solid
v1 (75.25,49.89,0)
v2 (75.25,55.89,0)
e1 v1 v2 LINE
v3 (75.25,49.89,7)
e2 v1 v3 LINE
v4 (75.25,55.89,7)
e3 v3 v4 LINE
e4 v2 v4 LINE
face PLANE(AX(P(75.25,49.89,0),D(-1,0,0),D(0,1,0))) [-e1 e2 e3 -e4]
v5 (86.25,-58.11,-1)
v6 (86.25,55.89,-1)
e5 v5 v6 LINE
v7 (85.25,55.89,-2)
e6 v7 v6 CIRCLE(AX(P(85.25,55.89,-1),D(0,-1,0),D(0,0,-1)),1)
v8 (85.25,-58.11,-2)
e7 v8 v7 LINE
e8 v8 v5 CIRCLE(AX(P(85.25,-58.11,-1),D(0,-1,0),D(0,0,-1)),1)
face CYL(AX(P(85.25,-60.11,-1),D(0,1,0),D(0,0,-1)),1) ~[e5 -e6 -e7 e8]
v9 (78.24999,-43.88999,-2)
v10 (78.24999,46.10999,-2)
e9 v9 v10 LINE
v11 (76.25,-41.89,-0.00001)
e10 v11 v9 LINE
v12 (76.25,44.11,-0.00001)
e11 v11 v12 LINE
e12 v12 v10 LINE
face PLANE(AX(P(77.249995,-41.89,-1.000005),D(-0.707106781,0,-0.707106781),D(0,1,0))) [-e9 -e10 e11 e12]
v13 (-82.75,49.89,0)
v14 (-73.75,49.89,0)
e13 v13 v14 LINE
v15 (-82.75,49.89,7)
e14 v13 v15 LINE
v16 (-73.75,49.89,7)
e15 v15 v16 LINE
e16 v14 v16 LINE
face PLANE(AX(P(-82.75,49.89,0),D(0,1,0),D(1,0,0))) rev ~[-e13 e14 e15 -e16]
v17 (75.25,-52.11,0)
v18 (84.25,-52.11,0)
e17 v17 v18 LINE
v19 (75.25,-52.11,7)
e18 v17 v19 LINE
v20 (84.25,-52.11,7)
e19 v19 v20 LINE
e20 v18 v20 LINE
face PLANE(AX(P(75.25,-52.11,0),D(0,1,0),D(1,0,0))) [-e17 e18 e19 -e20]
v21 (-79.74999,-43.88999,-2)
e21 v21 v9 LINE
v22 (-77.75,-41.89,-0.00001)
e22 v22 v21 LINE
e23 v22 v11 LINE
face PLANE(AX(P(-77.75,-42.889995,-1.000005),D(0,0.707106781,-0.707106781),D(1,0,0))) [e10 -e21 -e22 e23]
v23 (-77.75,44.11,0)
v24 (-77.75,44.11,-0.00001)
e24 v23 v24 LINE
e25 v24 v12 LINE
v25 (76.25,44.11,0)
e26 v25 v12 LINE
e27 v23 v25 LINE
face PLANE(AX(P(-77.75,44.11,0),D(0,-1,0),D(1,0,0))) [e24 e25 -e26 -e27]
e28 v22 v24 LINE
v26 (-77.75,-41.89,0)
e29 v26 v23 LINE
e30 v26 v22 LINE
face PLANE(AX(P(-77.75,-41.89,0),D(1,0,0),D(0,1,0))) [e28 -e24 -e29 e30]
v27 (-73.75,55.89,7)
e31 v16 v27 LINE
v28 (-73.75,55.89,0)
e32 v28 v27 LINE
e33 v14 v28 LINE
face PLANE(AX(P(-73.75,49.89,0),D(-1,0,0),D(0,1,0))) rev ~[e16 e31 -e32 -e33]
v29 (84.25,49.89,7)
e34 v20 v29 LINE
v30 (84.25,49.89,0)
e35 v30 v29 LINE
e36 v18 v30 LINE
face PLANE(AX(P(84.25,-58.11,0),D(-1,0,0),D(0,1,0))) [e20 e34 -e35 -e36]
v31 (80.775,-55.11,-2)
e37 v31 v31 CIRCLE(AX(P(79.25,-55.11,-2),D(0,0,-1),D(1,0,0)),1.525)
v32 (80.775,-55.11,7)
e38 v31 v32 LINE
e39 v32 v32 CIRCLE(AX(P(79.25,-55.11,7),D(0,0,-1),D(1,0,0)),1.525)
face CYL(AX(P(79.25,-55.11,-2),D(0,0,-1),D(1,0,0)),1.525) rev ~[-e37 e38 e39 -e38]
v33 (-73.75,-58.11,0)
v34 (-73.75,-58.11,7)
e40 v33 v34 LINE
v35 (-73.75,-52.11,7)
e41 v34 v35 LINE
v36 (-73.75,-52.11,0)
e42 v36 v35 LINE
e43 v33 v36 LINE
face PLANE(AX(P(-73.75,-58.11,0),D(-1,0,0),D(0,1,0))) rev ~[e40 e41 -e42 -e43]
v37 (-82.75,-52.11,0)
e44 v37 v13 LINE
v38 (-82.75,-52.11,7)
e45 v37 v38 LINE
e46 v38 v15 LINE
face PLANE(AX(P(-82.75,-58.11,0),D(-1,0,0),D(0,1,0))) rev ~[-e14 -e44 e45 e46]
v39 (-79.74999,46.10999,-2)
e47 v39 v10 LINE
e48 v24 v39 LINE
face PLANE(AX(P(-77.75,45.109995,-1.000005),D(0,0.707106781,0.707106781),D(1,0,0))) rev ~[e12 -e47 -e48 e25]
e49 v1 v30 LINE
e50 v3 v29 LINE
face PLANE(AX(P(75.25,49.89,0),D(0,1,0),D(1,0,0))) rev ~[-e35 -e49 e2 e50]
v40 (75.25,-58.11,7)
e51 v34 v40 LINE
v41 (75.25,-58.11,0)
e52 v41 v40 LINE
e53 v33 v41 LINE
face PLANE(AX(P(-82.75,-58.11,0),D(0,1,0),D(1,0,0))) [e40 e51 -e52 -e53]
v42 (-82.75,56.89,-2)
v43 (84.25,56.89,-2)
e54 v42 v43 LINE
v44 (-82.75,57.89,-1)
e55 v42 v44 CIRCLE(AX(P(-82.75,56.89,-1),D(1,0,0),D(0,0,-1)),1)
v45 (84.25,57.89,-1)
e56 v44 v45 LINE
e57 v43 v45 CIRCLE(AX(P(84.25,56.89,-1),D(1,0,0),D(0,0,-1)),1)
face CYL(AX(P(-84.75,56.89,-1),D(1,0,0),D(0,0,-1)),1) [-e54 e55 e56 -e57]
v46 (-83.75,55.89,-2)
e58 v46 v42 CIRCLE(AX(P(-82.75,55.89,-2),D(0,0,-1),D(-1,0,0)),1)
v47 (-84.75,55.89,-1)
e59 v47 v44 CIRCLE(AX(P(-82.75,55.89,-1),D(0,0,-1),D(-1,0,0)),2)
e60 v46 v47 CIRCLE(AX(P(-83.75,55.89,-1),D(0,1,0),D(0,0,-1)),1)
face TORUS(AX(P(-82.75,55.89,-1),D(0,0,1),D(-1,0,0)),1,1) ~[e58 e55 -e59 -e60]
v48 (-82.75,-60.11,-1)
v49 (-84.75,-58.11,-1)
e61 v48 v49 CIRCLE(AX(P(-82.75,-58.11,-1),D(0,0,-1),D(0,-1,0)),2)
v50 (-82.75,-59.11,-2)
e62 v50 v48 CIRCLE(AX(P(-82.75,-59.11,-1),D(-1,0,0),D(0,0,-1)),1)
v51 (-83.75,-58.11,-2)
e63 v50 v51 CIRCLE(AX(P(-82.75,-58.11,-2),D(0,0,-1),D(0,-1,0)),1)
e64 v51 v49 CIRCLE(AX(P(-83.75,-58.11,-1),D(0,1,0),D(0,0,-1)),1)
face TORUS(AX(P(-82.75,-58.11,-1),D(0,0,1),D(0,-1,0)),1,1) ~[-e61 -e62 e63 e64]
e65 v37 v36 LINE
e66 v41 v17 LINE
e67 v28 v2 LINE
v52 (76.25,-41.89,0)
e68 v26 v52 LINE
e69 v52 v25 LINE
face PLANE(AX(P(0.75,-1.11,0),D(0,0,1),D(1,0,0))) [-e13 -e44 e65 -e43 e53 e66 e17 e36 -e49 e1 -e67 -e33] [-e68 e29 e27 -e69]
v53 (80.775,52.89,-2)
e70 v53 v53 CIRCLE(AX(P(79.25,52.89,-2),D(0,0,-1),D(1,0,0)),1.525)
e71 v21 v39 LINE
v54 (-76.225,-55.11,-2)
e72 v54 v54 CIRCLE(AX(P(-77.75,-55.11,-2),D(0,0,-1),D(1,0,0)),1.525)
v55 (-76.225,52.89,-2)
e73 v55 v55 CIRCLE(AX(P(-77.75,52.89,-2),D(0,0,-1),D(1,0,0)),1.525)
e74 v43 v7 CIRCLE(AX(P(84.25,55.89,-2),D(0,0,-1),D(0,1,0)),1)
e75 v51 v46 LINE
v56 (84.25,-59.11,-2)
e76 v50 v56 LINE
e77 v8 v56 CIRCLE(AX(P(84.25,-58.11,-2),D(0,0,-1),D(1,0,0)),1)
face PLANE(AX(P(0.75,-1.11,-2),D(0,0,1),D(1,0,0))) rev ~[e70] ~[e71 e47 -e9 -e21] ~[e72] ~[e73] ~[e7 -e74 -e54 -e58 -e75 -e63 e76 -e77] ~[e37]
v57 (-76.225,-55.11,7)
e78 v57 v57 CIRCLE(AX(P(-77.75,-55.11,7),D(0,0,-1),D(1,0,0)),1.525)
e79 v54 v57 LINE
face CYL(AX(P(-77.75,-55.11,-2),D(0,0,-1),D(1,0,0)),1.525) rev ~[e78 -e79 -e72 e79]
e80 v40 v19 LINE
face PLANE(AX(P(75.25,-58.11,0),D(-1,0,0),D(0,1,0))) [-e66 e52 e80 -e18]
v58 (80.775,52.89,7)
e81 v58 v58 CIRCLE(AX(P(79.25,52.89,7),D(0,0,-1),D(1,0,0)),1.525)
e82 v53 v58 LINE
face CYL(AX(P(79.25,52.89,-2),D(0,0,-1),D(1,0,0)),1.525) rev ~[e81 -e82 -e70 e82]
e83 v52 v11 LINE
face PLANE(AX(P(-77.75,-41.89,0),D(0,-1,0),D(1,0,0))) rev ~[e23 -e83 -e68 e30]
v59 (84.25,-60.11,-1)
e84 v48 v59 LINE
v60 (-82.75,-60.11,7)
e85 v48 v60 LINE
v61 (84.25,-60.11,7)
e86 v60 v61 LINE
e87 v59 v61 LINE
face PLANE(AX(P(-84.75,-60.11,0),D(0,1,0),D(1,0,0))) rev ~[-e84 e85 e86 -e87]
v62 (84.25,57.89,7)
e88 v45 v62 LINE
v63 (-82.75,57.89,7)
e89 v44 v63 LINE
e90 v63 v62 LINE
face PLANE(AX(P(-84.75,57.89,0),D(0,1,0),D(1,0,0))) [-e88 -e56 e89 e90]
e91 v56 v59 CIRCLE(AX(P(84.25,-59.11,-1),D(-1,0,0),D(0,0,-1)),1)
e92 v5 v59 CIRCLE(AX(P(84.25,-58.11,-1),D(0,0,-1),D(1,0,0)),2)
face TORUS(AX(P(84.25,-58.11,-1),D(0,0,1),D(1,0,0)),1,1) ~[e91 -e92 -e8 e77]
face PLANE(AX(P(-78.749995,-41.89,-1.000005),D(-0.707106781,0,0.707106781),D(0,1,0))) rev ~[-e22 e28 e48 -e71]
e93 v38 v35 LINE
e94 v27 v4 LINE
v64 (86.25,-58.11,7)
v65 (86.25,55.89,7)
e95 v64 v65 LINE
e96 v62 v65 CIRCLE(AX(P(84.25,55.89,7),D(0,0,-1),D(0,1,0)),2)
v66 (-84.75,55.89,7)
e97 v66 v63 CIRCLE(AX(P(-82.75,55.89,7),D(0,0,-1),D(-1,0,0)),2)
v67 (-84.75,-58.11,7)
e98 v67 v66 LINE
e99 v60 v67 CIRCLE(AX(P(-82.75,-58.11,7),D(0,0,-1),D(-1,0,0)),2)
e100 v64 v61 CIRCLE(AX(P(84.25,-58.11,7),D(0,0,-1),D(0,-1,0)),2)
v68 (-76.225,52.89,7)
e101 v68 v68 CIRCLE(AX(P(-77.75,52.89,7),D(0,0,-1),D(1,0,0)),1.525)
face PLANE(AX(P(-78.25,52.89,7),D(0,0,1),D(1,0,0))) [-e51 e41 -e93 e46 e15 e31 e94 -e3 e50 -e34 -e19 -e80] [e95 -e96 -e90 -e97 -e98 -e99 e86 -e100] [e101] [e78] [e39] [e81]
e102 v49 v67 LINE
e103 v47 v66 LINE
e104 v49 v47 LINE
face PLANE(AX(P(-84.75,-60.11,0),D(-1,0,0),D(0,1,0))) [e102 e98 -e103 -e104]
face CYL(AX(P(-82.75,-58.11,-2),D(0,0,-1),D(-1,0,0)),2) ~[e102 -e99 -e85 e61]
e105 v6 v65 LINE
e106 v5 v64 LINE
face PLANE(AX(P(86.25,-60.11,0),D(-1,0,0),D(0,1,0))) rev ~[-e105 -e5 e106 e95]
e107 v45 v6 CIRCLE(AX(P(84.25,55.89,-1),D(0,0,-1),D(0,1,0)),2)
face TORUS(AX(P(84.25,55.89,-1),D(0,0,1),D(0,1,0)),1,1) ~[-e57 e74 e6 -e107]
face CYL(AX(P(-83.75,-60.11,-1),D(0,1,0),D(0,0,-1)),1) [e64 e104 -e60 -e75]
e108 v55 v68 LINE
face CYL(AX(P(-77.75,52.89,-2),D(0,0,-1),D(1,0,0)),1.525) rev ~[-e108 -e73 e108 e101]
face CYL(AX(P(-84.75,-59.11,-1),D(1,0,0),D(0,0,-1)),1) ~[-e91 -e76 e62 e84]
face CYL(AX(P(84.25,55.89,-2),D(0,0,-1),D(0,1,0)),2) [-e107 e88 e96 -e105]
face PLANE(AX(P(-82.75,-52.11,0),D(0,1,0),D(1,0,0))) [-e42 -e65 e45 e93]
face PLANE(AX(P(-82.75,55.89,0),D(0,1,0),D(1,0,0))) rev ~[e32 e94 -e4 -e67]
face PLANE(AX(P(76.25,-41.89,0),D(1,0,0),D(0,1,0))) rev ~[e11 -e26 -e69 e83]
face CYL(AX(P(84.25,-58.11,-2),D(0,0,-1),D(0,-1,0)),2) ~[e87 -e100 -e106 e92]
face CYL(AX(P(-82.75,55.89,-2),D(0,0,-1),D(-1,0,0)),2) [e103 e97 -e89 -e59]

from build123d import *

# Parameters (mm, degrees)
F0_W          = 171
F0_H          = 118
F0_W_2        = 154
F0_H_2        = 86
F1_DEPTH      = 2
F2_SIZE       = 1.99999
F3_R          = 1
F4_W          = 171
F4_H          = 118
F4_W_2        = 167
F4_H_2        = 114
F5_DEPTH      = 7
F6_W          = 9
F6_H          = 6
F7_DEPTH      = 7
F8_R          = 1.525
F9_DEPTH      = 9.001
F10_T1_DEPTH  = 14
F10_T4_ANGLE  = 90
F10_T6_ANGLE  = 90
F10_T8_ANGLE  = 90
F10_T10_ANGLE = 90


# Not quite as in the source:
# - a fillet or chamfer that OpenCascade refuses, or shapes differently, is made with other operations: its cross-section is extruded or revolved along the edge and cut away or added
# - a fillet or chamfer is up to 0.001 mm smaller than in the source, because OpenCascade refuses the exact size


with BuildPart() as f1:
    # F0 (on Top) → F1 (new body)
    with BuildSketch(Plane.XY):
        with Locations((0.75, -1.11)):
            Rectangle(F0_W, F0_H)
        with Locations((-0.75, 1.11)):
            Rectangle(F0_W_2, F0_H_2, mode=Mode.SUBTRACT)
    extrude(amount=-F1_DEPTH)

    # F2 (size 2 in the source; OpenCascade refuses exactly that, so slightly less here)
    f2_edges = [f1.edges().sort_by_distance(p)[0] for p in [
        (76.25, 1.11, -2),
        (-0.75, -41.89, -2),
        (-0.75, 44.11, -2),
        (-77.75, 1.11, -2),
    ]]
    chamfer(f2_edges, length=F2_SIZE)

    # F3
    f3_edges = [f1.edges().sort_by_distance(p)[0] for p in [
        (-84.75, -1.11, -2),
        (0.75, -60.11, -2),
        (86.25, -1.11, -2),
        (0.75, 57.89, -2),
    ]]
    fillet(f3_edges, radius=F3_R)

    # F4 (on face) → F5 (join)
    with BuildSketch(Plane.XY):
        with Locations((0.75, -1.11)):
            Rectangle(F4_W, F4_H)
        with Locations((0.75, -1.11)):
            Rectangle(F4_W_2, F4_H_2, mode=Mode.SUBTRACT)
    extrude(amount=F5_DEPTH)

    # F6 (on face) → F7 (join)
    with BuildSketch(Plane.XY):
        with Locations((-78.25, 52.89)):
            Rectangle(F6_W, F6_H)
        with Locations((79.75, 52.89)):
            Rectangle(F6_W, F6_H)
        with Locations((79.75, -55.11)):
            Rectangle(F6_W, F6_H)
        with Locations((-78.25, -55.11)):
            Rectangle(F6_W, F6_H)
    extrude(amount=F7_DEPTH)

    # F8 (on face) → F9 (cut, through all)
    with BuildSketch(Plane(origin=(0, 0, -2), x_dir=(1, 0, 0), z_dir=(0, 0, -1))):
        with Locations((-77.75, 55.11)):
            Circle(F8_R)
        with Locations((79.25, 55.11)):
            Circle(F8_R)
        with Locations((-77.75, -52.89)):
            Circle(F8_R)
        with Locations((79.25, -52.89)):
            Circle(F8_R)
    extrude(amount=-F9_DEPTH, mode=Mode.SUBTRACT)

    # F10: fillet of radius 2 on 4 edges, made by hand

    # F10_s2 → F10_t1 (cut)
    with BuildSketch(Plane.XY.offset(-2)):
        with BuildLine():
            ThreePointArc((-84.75, 55.89), (-84.1642135624, 57.3042135624), (-82.75, 57.89))
            Line((-82.75, 57.89), (-84.75, 57.89))
            Line((-84.75, 57.89), (-84.75, 55.89))
        make_face()
        with BuildLine():
            ThreePointArc((84.25, 57.89), (85.6642135624, 57.3042135624), (86.25, 55.89))
            Line((86.25, 55.89), (86.25, 57.89))
            Line((86.25, 57.89), (84.25, 57.89))
        make_face()
        with BuildLine():
            ThreePointArc((84.25, -60.11), (85.6642135624, -59.5242135624), (86.25, -58.11))
            Line((86.25, -58.11), (86.25, -60.11))
            Line((86.25, -60.11), (84.25, -60.11))
        make_face()
        with BuildLine():
            ThreePointArc((-84.75, -58.11), (-84.1642135624, -59.5242135624), (-82.75, -60.11))
            Line((-82.75, -60.11), (-84.75, -60.11))
            Line((-84.75, -60.11), (-84.75, -58.11))
        make_face()
    extrude(amount=F10_T1_DEPTH, mode=Mode.SUBTRACT)

    # F10_s3 → F10_t4 (revolve, cut)
    with BuildSketch(Plane.YZ.offset(-82.75)):
        with BuildLine():
            ThreePointArc((-59.11, -2), (-59.8171067812, -1.7071067812), (-60.11, -1))
            Line((-60.11, -1), (-60.11, -2))
            Line((-60.11, -2), (-59.11, -2))
        make_face()
    revolve(axis=Axis((-82.75, -58.11, -2), (0, 0, -1)), revolution_arc=F10_T4_ANGLE, mode=Mode.SUBTRACT)

    # F10_s5 → F10_t6 (revolve, cut)
    with BuildSketch(Plane.XZ.offset(58.11)):
        with BuildLine():
            ThreePointArc((85.25, -2), (85.9571067812, -1.7071067812), (86.25, -1))
            Line((86.25, -1), (86.25, -2))
            Line((86.25, -2), (85.25, -2))
        make_face()
    revolve(axis=Axis((84.25, -58.11, -2), (0, 0, -1)), revolution_arc=F10_T6_ANGLE, mode=Mode.SUBTRACT)

    # F10_s7 → F10_t8 (revolve, cut)
    with BuildSketch(Plane.YZ.offset(84.25)):
        with BuildLine():
            ThreePointArc((56.89, -2), (57.5971067812, -1.7071067812), (57.89, -1))
            Line((57.89, -1), (57.89, -2))
            Line((57.89, -2), (56.89, -2))
        make_face()
    revolve(axis=Axis((84.25, 55.89, -2), (0, 0, -1)), revolution_arc=F10_T8_ANGLE, mode=Mode.SUBTRACT)

    # F10_s9 → F10_t10 (revolve, cut)
    with BuildSketch(Plane.XZ.offset(-55.89)):
        with BuildLine():
            ThreePointArc((-83.75, -2), (-84.4571067812, -1.7071067812), (-84.75, -1))
            Line((-84.75, -1), (-84.75, -2))
            Line((-84.75, -2), (-83.75, -2))
        make_face()
    revolve(axis=Axis((-82.75, 55.89, -2), (0, 0, -1)), revolution_arc=F10_T10_ANGLE, mode=Mode.SUBTRACT)


solid = f1.part
